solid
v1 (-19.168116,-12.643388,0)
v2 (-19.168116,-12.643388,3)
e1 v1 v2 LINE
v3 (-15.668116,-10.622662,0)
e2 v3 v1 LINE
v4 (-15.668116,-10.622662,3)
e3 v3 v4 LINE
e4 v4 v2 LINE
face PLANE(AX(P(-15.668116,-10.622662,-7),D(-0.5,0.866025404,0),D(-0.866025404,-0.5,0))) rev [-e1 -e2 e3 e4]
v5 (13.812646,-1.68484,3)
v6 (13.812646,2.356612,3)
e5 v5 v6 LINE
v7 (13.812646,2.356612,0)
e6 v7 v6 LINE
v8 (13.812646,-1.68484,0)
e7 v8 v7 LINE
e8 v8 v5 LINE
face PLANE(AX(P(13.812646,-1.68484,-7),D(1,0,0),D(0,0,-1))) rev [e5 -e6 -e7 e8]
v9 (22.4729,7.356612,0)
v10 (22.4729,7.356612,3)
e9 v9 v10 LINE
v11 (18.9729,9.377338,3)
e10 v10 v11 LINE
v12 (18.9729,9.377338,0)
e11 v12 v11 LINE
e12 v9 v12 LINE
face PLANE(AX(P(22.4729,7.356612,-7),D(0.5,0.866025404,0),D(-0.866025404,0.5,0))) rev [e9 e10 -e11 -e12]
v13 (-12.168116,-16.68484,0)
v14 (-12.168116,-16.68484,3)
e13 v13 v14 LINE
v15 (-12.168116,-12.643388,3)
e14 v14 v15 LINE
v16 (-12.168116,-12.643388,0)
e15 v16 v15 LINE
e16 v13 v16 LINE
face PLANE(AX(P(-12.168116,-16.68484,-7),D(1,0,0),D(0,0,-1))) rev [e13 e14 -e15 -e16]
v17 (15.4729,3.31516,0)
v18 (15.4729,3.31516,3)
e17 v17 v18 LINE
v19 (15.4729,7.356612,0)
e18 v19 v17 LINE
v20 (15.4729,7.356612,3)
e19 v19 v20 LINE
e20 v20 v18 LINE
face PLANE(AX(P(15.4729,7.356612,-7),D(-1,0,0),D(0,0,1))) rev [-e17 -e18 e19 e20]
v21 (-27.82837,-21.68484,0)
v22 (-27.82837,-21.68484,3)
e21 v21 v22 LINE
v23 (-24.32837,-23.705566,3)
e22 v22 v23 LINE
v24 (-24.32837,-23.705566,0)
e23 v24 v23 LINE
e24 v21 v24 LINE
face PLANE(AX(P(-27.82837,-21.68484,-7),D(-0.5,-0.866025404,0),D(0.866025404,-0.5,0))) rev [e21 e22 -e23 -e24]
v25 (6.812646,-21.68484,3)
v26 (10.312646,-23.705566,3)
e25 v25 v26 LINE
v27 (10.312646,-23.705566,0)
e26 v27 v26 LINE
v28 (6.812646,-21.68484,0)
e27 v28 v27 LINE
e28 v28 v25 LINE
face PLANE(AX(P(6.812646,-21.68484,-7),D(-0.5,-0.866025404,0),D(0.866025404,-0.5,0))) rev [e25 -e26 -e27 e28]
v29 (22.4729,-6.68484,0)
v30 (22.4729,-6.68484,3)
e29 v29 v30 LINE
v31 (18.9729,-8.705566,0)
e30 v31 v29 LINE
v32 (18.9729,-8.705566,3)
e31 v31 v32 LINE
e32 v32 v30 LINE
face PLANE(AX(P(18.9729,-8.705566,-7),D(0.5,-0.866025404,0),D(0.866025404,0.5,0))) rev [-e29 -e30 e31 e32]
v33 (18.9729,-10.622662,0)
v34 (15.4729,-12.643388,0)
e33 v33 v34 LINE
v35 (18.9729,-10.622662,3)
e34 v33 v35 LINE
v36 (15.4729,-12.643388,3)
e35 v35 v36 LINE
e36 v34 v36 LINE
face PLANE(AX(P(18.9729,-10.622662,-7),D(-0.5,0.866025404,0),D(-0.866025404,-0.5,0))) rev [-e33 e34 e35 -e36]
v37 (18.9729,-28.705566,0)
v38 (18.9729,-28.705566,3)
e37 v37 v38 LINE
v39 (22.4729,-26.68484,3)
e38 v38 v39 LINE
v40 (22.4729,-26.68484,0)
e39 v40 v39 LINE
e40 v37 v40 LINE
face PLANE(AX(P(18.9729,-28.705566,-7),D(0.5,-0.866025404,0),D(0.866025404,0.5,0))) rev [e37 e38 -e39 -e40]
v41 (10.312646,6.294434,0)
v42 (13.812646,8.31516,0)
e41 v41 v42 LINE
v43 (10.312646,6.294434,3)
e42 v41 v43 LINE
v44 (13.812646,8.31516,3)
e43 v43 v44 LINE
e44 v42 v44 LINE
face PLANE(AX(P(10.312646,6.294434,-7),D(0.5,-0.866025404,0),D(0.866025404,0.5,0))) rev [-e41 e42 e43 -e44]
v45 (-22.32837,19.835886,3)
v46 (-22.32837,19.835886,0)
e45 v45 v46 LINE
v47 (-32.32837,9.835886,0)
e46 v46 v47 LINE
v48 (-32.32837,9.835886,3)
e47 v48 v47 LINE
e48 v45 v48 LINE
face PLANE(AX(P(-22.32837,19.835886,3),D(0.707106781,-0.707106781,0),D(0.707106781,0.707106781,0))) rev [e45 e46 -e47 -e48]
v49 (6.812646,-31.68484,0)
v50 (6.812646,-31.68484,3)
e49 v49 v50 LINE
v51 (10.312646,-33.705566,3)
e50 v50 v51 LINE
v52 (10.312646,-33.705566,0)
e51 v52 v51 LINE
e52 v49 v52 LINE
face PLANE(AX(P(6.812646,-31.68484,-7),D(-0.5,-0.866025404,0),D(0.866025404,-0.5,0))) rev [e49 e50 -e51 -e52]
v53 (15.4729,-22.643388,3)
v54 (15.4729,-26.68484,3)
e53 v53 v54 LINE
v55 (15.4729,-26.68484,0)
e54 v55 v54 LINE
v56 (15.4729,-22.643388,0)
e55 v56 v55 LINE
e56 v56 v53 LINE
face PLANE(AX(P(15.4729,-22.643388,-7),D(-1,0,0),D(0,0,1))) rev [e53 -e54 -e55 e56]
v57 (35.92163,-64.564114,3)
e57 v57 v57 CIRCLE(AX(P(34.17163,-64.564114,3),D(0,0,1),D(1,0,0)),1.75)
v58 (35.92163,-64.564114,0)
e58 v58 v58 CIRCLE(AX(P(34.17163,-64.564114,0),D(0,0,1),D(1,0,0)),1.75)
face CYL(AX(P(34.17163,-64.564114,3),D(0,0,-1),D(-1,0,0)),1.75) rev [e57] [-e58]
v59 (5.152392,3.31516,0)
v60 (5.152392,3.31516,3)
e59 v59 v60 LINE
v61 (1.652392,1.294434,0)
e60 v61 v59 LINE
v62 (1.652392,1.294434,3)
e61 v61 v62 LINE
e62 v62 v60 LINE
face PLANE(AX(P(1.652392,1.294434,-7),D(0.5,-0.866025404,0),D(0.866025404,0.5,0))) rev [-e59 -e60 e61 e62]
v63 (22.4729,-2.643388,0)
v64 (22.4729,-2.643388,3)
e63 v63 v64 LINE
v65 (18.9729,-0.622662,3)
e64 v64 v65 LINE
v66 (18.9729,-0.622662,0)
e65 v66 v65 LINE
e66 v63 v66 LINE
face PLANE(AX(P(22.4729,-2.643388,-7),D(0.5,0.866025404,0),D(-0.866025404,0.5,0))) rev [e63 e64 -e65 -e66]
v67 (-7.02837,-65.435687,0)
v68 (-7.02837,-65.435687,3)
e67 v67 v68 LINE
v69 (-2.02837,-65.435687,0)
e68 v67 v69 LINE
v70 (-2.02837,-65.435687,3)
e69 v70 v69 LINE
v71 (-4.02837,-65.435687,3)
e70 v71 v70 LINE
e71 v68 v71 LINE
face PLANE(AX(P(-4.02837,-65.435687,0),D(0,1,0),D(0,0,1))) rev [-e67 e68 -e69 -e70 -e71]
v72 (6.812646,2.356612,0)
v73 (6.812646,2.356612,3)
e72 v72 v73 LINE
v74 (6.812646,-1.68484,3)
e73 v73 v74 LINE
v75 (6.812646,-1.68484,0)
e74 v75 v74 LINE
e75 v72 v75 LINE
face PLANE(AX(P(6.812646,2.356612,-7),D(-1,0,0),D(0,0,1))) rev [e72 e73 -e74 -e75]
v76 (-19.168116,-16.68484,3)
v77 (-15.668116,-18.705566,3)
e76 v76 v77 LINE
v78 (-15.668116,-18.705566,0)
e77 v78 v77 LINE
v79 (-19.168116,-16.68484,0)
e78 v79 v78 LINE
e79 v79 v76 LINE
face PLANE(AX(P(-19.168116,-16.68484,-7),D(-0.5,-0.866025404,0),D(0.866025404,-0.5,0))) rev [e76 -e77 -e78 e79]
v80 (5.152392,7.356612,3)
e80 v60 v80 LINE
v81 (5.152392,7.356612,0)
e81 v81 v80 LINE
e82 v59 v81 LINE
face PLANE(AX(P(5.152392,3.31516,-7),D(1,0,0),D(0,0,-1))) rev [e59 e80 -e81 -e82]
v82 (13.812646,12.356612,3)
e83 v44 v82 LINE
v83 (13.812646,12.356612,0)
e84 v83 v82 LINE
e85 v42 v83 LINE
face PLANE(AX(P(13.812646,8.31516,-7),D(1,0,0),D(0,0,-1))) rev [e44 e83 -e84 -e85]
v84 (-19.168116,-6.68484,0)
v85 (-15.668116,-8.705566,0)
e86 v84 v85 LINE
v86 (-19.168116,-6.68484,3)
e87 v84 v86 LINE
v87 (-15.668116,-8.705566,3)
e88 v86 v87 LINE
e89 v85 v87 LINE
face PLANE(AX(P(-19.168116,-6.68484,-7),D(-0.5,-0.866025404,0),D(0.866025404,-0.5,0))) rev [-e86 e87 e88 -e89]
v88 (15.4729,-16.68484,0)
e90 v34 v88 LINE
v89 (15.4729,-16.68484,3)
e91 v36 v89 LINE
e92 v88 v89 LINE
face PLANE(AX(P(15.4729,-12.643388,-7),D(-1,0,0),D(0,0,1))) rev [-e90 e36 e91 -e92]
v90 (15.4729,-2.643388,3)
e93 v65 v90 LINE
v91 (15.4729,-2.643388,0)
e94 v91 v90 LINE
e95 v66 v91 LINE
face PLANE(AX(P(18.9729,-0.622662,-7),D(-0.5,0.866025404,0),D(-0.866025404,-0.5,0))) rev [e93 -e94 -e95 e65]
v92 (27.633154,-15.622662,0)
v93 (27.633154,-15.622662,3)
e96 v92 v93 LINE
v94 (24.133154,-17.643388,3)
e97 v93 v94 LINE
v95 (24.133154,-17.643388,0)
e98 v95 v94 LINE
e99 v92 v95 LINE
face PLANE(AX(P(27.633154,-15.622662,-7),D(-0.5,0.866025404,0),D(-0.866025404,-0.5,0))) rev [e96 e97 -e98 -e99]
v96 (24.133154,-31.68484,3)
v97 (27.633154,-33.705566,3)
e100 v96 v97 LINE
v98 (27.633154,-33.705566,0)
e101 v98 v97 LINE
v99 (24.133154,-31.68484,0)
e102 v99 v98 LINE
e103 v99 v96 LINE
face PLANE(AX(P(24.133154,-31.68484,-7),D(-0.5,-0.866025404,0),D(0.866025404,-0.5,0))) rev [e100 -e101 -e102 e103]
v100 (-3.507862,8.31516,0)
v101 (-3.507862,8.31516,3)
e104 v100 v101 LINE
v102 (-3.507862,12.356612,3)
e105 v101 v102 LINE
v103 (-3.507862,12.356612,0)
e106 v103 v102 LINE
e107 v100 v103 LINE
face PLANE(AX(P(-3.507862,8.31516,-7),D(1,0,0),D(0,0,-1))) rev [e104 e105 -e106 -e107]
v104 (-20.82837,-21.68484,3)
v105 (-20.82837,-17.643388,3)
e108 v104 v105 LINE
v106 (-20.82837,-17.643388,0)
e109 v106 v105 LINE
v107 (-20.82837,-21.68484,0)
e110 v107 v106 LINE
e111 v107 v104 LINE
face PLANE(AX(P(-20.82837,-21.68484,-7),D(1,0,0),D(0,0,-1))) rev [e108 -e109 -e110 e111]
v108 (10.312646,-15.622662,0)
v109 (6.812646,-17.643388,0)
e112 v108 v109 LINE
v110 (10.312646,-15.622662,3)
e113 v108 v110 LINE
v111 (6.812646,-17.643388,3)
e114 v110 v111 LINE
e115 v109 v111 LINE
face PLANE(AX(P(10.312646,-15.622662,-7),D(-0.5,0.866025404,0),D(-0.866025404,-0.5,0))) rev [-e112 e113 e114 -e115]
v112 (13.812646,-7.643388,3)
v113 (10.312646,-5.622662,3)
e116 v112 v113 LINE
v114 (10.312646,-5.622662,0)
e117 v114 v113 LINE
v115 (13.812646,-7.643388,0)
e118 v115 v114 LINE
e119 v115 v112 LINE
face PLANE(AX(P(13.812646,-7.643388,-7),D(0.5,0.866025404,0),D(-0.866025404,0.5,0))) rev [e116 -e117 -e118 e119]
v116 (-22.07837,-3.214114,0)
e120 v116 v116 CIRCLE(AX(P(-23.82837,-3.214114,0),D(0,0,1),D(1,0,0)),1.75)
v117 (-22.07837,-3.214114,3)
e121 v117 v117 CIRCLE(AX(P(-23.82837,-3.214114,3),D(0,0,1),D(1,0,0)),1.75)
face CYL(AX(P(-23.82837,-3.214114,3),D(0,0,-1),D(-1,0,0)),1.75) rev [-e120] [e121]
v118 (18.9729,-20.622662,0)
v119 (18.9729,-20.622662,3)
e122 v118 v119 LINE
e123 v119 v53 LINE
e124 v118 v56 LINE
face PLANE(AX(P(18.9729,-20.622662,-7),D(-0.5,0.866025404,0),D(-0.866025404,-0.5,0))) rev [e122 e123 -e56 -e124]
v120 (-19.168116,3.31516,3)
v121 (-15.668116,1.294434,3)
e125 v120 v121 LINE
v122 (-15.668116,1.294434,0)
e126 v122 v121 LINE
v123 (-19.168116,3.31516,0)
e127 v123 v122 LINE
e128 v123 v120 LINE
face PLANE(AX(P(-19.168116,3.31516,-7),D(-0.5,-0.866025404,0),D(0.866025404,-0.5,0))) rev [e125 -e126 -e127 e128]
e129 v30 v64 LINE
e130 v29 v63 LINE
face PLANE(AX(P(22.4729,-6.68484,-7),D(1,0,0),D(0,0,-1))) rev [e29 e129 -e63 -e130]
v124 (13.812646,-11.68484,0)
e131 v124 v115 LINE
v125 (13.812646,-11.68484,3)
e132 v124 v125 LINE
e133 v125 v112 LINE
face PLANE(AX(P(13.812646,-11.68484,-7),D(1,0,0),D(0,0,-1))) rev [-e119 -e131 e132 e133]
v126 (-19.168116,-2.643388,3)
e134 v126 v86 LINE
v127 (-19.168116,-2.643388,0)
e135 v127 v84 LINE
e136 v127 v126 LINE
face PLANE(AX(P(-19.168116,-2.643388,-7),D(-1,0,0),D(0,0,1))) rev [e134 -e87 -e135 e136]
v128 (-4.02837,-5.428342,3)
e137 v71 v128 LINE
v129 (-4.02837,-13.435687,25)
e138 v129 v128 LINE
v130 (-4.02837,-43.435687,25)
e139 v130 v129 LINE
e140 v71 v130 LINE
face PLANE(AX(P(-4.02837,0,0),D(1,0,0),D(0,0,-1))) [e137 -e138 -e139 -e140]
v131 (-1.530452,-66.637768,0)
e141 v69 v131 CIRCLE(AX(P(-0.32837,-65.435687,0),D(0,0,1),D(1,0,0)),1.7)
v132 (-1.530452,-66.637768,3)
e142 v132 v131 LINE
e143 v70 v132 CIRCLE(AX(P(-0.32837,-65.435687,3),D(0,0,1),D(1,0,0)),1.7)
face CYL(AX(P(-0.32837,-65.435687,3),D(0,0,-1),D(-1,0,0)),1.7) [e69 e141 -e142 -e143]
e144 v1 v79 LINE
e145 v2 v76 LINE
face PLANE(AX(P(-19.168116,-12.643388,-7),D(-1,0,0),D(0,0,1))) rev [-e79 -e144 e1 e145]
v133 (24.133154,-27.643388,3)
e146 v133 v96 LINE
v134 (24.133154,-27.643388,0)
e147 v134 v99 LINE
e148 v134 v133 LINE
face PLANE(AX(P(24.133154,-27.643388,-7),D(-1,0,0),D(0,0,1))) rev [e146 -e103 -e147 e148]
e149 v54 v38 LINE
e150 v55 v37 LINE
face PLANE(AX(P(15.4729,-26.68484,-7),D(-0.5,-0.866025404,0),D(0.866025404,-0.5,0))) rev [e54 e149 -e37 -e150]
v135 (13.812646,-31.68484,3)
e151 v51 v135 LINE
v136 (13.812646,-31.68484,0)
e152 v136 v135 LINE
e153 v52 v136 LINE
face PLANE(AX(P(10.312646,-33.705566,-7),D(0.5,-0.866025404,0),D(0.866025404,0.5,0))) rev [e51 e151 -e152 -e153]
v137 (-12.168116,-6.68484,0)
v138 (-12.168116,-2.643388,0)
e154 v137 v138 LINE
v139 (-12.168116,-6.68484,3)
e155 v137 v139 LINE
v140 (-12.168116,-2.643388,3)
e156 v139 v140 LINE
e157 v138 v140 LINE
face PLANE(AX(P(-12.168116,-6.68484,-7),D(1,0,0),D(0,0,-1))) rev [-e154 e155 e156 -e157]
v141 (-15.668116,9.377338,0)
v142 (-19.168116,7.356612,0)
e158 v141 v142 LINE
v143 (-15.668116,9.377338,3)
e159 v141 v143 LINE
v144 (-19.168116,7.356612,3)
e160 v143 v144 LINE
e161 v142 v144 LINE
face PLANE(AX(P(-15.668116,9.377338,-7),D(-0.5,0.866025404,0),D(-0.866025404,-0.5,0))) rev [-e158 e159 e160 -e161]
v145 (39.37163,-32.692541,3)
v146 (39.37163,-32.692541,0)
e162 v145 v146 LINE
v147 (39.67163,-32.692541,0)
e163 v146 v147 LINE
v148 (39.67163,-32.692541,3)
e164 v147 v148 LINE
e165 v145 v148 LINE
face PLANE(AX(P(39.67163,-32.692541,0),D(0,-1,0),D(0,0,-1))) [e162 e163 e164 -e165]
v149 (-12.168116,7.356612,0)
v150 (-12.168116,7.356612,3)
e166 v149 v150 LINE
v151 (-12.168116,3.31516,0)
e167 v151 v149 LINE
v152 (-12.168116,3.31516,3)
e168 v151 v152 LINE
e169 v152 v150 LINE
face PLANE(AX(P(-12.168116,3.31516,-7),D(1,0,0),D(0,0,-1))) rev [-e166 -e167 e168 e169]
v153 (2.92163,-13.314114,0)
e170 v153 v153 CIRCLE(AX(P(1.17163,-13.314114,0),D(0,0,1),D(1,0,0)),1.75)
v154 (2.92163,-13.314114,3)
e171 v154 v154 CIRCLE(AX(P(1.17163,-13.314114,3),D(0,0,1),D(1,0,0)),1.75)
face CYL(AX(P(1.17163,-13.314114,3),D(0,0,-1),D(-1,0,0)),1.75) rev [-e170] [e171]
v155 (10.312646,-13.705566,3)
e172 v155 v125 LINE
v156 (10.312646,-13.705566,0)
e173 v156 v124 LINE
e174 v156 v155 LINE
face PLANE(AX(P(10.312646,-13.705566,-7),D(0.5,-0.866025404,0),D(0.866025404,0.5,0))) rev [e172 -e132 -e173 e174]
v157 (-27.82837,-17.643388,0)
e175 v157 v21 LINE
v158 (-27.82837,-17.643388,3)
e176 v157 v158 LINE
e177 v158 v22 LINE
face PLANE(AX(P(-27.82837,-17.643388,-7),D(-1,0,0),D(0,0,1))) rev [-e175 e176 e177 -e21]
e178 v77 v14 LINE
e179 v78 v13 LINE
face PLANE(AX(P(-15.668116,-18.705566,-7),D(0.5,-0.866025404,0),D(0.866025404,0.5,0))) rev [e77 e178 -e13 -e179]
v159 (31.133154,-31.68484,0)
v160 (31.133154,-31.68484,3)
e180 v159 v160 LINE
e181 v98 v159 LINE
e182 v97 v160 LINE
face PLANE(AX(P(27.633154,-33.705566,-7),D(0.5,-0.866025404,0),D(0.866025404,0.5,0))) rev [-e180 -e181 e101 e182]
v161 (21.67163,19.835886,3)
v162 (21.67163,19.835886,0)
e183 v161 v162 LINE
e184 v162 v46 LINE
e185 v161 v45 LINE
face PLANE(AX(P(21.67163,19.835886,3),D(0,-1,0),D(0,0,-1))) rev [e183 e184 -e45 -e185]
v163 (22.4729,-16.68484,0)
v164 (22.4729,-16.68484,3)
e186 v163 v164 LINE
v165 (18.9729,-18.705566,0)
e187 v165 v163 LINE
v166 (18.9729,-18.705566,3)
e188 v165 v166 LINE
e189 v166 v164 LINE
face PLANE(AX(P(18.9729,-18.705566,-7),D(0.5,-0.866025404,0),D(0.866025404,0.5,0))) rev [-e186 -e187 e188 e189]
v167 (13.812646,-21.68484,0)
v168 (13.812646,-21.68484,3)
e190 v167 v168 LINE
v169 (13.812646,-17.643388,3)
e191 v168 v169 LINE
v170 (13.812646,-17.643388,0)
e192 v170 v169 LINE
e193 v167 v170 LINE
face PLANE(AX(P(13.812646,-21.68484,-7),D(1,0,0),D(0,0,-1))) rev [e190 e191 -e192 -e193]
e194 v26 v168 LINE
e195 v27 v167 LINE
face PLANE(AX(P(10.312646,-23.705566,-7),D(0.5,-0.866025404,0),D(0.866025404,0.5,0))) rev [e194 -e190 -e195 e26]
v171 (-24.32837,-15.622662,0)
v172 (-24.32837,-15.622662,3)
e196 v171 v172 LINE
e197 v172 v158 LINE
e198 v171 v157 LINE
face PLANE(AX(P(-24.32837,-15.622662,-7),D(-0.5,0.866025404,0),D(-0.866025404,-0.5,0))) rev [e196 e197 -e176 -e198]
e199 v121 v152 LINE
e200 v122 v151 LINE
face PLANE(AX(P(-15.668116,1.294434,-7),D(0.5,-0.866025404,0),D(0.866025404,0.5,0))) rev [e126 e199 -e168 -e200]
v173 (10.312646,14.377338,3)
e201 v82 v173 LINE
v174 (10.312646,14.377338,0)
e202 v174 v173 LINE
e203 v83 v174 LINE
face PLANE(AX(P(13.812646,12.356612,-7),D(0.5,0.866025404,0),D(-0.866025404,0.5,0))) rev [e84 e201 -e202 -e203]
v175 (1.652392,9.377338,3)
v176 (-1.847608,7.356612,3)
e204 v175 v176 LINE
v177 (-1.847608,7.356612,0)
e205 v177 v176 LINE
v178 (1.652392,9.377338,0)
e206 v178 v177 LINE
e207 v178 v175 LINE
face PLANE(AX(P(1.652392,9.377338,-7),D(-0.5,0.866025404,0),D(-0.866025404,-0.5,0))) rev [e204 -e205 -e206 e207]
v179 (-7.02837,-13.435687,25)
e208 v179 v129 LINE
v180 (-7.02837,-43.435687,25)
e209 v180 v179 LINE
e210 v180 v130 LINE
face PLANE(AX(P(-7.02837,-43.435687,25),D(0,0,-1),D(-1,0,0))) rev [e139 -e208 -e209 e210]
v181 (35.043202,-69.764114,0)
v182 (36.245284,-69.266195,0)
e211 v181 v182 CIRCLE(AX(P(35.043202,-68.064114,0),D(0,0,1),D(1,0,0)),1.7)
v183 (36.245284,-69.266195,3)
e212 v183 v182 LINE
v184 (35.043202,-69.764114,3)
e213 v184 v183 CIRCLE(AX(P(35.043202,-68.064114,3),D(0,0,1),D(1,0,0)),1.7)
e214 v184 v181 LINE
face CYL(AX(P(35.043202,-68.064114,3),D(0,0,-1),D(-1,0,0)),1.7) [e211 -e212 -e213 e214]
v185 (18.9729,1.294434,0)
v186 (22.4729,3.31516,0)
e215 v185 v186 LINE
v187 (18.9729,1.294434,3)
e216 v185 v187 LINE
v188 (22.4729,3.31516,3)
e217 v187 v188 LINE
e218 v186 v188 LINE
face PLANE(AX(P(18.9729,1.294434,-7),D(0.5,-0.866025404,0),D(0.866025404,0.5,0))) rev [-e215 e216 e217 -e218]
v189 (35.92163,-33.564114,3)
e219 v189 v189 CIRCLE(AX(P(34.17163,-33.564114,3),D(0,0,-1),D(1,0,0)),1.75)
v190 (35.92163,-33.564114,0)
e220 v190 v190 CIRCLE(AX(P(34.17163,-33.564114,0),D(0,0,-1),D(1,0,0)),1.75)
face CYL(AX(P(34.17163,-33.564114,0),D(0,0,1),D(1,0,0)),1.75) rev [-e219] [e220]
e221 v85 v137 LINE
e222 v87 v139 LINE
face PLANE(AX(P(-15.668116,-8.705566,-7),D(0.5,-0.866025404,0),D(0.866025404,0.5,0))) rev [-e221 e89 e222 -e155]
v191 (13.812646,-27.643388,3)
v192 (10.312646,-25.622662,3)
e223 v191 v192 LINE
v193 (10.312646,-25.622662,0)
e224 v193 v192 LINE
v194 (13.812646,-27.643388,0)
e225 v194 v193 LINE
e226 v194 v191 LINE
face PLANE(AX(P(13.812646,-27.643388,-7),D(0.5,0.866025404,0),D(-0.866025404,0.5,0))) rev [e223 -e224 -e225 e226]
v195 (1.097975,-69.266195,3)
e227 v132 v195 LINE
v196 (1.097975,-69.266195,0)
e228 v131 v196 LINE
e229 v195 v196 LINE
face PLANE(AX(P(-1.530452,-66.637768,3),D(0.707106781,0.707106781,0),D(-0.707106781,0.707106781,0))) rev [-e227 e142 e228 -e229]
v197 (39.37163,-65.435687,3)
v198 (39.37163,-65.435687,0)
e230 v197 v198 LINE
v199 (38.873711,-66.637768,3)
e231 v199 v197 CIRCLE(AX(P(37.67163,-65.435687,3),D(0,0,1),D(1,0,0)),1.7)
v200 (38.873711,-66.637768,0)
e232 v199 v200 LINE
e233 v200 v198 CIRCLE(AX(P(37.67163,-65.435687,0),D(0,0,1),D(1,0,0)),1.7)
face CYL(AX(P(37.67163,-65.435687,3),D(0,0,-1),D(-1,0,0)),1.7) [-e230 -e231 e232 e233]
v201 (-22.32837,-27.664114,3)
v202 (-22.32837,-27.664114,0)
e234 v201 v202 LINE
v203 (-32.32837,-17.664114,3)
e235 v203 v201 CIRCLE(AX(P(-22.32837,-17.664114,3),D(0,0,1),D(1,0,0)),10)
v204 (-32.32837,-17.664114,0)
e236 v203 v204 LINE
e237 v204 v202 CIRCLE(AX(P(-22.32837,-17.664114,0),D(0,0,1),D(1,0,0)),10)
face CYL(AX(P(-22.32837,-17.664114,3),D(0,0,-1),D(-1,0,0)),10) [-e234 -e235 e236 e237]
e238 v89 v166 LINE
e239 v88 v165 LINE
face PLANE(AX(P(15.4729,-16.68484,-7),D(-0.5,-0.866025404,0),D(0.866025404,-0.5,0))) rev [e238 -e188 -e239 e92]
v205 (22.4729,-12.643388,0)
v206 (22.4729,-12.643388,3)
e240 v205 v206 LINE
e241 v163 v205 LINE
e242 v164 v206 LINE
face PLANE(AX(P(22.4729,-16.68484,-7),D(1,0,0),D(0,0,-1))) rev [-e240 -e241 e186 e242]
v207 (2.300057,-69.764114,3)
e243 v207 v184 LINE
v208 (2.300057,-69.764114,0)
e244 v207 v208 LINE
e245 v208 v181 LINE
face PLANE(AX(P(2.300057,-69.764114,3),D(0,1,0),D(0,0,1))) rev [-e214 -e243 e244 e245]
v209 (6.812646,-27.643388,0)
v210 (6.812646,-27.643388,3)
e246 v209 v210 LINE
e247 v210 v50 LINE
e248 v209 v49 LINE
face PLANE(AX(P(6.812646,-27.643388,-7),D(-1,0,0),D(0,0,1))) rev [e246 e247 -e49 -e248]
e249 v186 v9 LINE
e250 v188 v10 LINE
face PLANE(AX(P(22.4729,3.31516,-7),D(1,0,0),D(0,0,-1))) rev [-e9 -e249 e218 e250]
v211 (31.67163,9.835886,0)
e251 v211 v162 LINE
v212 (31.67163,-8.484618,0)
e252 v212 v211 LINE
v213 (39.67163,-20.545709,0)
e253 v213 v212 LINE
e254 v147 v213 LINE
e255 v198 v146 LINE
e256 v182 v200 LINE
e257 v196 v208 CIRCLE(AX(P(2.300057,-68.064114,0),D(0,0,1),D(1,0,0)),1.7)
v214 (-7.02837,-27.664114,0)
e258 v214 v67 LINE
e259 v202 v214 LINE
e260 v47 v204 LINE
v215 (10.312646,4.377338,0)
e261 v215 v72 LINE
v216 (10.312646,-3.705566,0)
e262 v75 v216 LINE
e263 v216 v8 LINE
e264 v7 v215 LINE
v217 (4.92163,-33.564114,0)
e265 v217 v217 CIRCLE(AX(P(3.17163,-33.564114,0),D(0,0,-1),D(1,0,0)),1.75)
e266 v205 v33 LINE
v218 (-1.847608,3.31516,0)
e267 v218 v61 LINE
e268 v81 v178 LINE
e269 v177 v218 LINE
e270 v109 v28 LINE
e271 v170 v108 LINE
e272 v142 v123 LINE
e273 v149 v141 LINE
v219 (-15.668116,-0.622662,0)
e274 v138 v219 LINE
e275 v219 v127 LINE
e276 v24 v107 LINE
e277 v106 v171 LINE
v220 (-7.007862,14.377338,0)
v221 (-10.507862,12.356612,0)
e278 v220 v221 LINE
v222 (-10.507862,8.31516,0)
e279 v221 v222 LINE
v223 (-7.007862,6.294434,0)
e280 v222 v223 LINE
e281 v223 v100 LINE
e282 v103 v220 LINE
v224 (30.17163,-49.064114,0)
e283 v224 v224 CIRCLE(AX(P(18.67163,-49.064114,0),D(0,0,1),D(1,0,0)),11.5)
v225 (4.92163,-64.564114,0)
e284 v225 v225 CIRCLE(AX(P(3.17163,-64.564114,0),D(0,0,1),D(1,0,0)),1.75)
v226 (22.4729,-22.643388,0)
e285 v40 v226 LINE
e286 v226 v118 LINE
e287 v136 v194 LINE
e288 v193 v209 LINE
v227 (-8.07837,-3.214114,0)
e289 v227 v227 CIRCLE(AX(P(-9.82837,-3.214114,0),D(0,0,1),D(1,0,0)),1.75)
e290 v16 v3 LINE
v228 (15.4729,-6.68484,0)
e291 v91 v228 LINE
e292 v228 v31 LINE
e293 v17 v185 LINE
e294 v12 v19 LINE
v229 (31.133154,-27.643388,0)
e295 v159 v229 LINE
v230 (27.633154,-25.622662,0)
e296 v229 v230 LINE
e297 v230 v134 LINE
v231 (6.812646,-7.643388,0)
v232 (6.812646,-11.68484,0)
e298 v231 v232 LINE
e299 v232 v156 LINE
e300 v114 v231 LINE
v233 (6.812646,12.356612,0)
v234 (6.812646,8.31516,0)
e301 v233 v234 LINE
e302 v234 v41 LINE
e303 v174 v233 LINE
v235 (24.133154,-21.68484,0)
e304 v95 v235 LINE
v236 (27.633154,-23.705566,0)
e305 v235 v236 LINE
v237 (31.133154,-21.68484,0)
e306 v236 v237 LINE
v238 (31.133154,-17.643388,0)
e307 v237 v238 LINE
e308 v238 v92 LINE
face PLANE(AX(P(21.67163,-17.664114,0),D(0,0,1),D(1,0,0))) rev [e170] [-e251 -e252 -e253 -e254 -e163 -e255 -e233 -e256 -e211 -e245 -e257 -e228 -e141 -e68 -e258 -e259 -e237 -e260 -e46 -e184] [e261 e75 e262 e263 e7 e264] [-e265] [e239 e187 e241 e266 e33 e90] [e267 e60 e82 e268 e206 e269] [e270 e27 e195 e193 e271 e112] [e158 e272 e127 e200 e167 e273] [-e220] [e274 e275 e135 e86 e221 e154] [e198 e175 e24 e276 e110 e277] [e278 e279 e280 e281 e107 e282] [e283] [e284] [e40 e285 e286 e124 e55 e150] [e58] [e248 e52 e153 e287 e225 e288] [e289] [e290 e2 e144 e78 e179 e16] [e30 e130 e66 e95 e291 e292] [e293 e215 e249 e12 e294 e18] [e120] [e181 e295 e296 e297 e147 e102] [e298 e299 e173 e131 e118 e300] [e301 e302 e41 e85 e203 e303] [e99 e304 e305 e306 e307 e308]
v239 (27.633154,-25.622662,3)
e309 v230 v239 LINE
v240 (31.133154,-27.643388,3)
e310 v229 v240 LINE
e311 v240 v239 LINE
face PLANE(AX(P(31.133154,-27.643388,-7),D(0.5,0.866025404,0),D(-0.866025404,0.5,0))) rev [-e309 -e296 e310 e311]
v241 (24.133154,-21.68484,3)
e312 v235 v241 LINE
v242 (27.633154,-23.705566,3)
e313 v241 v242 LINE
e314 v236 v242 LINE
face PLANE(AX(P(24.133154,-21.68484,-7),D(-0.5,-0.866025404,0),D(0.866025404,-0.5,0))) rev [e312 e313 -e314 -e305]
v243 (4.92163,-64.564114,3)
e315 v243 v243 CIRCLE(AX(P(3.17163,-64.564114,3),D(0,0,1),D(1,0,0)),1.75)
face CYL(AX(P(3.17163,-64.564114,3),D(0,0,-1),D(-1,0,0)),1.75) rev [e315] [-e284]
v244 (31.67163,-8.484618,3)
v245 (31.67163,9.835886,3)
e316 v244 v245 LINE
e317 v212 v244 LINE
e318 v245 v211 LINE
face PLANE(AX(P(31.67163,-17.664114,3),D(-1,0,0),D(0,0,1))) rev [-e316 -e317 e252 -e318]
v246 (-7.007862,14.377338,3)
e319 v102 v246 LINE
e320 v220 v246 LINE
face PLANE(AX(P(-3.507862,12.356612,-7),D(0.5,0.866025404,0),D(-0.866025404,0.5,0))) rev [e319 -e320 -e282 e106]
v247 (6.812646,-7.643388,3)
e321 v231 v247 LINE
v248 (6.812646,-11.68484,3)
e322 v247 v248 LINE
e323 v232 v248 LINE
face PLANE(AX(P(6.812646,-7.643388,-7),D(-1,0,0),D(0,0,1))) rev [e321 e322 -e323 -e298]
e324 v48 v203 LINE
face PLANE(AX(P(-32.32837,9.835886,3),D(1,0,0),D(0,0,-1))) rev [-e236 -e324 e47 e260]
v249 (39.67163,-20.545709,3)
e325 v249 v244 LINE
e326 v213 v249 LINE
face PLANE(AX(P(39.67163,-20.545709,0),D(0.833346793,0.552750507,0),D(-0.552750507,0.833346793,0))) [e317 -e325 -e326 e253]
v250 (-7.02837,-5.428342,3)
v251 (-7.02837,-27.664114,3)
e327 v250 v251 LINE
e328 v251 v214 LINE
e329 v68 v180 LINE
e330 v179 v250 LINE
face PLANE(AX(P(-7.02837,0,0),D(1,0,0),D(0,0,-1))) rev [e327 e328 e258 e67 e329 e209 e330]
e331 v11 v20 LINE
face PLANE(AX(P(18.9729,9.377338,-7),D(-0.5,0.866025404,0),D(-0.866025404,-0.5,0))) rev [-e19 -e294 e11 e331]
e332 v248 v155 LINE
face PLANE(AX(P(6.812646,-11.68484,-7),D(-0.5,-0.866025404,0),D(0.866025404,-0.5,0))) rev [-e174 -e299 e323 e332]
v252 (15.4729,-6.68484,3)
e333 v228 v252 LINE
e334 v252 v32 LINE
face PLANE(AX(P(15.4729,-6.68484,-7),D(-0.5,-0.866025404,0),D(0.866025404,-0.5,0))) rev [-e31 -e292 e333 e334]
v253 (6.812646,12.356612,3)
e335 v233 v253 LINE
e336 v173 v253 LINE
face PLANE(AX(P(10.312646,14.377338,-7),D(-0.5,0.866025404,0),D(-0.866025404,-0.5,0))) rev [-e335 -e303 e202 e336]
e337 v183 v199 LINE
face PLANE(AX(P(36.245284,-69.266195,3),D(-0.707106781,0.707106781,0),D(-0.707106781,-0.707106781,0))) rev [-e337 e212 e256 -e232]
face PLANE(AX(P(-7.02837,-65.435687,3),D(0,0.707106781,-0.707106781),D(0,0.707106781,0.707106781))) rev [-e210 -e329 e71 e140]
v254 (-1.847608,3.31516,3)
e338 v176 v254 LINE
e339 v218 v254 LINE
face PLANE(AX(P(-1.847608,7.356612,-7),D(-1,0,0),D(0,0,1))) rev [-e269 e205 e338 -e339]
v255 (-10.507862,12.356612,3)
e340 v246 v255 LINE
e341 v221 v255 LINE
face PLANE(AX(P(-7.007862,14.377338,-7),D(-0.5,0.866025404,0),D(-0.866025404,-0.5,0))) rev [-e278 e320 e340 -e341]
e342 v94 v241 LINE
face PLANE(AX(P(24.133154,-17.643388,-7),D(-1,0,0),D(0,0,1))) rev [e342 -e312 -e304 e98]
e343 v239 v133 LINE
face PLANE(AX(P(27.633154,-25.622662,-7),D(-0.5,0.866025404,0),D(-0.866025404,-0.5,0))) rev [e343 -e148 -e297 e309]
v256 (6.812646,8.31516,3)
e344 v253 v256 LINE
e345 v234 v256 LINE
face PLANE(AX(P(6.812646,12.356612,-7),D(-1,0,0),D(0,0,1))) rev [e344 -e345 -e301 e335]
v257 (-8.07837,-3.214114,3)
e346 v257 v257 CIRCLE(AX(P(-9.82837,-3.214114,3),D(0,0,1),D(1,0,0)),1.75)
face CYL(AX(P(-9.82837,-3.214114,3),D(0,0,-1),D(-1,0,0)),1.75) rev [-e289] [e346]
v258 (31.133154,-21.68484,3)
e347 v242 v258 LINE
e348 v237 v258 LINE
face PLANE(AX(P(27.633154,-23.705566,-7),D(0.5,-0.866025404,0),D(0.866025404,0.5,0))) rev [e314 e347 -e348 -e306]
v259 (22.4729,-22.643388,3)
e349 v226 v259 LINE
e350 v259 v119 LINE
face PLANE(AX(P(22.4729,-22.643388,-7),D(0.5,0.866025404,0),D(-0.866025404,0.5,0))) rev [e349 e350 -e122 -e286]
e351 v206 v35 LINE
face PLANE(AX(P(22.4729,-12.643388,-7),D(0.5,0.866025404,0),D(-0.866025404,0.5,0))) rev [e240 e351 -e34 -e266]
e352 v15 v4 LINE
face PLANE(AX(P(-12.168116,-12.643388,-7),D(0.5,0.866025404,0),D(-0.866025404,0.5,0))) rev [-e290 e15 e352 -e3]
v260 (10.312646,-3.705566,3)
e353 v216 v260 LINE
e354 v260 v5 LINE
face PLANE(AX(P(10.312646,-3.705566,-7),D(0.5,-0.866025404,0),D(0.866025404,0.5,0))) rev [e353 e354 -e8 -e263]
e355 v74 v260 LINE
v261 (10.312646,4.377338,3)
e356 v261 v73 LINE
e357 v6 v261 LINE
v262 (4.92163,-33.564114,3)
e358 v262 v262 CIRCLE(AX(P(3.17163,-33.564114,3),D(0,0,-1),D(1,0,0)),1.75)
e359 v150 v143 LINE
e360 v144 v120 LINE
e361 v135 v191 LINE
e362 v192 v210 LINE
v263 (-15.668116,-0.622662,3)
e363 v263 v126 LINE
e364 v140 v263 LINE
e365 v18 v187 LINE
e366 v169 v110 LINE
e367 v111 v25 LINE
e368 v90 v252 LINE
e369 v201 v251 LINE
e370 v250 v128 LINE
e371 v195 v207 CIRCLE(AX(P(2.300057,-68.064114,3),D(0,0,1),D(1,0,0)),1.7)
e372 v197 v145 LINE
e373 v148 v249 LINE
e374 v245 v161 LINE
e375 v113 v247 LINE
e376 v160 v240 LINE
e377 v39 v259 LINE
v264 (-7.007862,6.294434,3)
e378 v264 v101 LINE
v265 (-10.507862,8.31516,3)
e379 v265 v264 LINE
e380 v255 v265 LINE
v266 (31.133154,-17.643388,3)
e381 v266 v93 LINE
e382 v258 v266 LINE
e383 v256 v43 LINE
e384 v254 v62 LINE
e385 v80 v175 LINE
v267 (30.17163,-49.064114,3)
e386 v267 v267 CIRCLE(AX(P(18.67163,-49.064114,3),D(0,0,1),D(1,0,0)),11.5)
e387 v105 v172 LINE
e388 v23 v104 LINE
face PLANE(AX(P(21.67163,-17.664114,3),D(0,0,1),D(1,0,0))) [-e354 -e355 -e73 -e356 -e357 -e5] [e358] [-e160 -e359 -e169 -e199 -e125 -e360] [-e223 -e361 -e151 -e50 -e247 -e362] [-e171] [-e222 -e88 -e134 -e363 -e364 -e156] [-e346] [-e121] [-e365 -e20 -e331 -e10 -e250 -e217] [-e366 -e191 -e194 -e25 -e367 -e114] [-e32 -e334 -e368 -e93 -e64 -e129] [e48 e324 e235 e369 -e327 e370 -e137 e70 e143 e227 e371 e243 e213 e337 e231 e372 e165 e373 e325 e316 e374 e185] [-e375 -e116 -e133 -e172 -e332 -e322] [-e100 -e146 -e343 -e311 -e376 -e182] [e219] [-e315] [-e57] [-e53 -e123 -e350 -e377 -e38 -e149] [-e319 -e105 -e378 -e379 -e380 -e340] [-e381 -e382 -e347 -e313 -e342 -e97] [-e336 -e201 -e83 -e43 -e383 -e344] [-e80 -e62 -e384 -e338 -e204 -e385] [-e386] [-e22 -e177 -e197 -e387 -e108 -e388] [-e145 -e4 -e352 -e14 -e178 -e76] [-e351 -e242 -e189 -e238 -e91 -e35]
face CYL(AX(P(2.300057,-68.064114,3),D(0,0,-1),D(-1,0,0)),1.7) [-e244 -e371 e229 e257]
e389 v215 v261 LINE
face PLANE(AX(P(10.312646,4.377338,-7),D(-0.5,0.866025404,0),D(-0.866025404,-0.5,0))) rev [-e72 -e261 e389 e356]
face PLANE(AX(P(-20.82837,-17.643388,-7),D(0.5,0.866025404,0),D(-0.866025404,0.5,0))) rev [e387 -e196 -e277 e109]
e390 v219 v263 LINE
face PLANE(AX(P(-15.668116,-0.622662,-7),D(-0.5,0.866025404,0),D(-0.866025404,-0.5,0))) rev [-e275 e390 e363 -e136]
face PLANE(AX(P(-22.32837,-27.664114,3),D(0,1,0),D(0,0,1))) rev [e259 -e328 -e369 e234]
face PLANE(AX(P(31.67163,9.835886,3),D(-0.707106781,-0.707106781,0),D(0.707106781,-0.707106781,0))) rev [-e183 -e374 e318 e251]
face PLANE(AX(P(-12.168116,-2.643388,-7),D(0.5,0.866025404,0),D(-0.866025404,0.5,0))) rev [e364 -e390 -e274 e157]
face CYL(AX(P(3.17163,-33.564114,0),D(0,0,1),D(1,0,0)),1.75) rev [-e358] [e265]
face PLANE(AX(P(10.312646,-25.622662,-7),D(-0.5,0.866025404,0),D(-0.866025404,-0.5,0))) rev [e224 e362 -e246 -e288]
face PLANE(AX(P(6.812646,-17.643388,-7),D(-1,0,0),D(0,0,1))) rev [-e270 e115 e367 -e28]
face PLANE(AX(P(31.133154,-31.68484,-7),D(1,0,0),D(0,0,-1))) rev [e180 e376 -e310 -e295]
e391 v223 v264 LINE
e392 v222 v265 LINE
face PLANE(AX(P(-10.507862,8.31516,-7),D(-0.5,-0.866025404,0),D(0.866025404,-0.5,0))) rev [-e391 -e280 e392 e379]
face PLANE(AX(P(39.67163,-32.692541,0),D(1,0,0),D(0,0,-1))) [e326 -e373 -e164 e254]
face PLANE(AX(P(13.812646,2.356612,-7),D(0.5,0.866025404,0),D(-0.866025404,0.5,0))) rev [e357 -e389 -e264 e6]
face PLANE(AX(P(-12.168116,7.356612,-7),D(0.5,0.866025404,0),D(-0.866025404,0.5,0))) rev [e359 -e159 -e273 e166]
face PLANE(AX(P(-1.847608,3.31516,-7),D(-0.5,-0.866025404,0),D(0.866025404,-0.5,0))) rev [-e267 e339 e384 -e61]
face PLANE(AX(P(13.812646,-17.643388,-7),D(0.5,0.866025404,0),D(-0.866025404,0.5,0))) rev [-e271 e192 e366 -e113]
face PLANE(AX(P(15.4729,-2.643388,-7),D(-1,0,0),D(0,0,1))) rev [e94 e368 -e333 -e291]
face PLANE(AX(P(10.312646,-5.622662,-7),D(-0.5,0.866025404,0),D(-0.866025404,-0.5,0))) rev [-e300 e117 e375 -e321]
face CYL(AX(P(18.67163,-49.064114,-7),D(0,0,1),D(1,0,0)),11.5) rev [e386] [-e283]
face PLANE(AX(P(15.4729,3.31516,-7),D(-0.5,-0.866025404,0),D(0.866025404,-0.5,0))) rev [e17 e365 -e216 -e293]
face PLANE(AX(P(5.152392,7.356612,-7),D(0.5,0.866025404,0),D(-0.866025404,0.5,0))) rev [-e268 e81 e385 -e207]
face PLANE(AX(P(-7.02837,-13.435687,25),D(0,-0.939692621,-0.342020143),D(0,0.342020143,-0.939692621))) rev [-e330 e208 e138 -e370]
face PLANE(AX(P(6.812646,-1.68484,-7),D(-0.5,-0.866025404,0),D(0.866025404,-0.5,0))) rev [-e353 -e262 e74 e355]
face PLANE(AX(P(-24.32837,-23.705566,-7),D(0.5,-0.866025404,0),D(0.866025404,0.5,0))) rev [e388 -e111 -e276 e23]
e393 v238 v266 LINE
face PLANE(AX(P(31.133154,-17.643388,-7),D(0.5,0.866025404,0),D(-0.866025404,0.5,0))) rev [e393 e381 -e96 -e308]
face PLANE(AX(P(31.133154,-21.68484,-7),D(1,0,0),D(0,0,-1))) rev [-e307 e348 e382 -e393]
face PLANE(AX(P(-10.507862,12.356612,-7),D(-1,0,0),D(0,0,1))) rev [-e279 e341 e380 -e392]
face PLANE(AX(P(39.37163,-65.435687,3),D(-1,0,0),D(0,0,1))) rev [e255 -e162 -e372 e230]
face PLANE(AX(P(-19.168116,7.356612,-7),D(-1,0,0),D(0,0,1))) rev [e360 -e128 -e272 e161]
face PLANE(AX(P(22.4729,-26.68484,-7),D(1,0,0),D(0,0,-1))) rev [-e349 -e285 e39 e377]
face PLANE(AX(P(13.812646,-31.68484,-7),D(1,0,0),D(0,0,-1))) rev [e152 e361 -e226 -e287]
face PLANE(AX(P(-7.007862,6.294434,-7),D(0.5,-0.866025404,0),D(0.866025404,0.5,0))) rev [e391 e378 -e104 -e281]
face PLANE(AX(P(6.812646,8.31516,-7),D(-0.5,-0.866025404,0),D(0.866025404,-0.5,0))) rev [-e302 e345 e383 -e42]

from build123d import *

# Parameters (mm, degrees)
SKETCH2_R               = 1.75
BOSS_EXTRUDE1_DEPTH     = 3
BOSS_EXTRUDE1_2_DEPTH   = 3
BOSS_EXTRUDE2_START     = -3
BOSS_EXTRUDE2_DEPTH     = 3
SKETCH5_W               = 3
SKETCH5_H               = 37.771572876
BOSS_EXTRUDE3_DEPTH     = 2
BOSS_EXTRUDE4_DEPTH     = 3
CUT_EXTRUDE1_DEPTH      = 10
SKETCH9_R               = 11.5
CUT_EXTRUDE2_DEPTH      = 10
FILL_PATTERN1_OUTLINE_R = 1.75
FILL_PATTERN1_DEPTH     = 3


# Read off the part's stored shape, not the designer's step: Fill Pattern1
with BuildPart() as part:
    # Sketch2 → Boss-Extrude1 (new body)
    with BuildSketch(Plane.XY):
        with BuildLine():
            Line((31.67162959, -17.664113805), (31.67162959, 9.835886195))
            Line((31.67162959, 9.835886195), (21.67162959, 19.835886195))
            Line((21.67162959, 19.835886195), (-22.32837041, 19.835886195))
            Line((-22.32837041, 19.835886195), (-32.32837041, 9.835886195))
            Line((-32.32837041, 9.835886195), (-32.32837041, -17.664113805))
            ThreePointArc((-32.32837041, -17.664113805), (-29.399438222, -24.735181617), (-22.32837041, -27.664113805))
            Line((-22.32837041, -27.664113805), (21.67162959, -27.664113805))
            ThreePointArc((21.67162959, -27.664113805), (28.742697402, -24.735181617), (31.67162959, -17.664113805))
        make_face()
        with Locations((18.67162959, 5.585886195)):
            Circle(SKETCH2_R, mode=Mode.SUBTRACT)
        with Locations((1.17162959, -13.314113805)):
            Circle(SKETCH2_R, mode=Mode.SUBTRACT)
        with Locations((-23.82837041, -3.214113805)):
            Circle(SKETCH2_R, mode=Mode.SUBTRACT)
        with Locations((-9.82837041, -3.214113805)):
            Circle(SKETCH2_R, mode=Mode.SUBTRACT)
    extrude(amount=BOSS_EXTRUDE1_DEPTH)



with BuildPart() as body_2:
    # Sketch2 → Boss-Extrude1 2 (new body)
    with BuildSketch(Plane.XY):
        with BuildLine():
            Line((-2.02837041, -32.69254093), (-2.02837041, -65.435686681))
            ThreePointArc((-2.02837041, -65.435686681), (-1.898965615, -66.086248516), (-1.530451938, -66.637768209))
            Line((-1.530451938, -66.637768209), (1.097975187, -69.266195333))
            ThreePointArc((1.097975187, -69.266195333), (1.64949488, -69.634709011), (2.300056715, -69.764113805))
            Line((2.300056715, -69.764113805), (35.043202465, -69.764113805))
            ThreePointArc((35.043202465, -69.764113805), (35.6937643, -69.634709011), (36.245283993, -69.266195333))
            Line((36.245283993, -69.266195333), (38.873711118, -66.637768209))
            ThreePointArc((38.873711118, -66.637768209), (39.242224795, -66.086248516), (39.37162959, -65.435686681))
            Line((39.37162959, -65.435686681), (39.37162959, -32.69254093))
            ThreePointArc((39.37162959, -32.69254093), (39.242224795, -32.041979095), (38.873711118, -31.490459402))
            Line((38.873711118, -31.490459402), (36.245283993, -28.862032277))
            ThreePointArc((36.245283993, -28.862032277), (35.6937643, -28.4935186), (35.043202465, -28.364113805))
            Line((35.043202465, -28.364113805), (2.300056715, -28.364113805))
            ThreePointArc((2.300056715, -28.364113805), (1.64949488, -28.4935186), (1.097975187, -28.862032277))
            Line((1.097975187, -28.862032277), (-1.530451938, -31.490459402))
            ThreePointArc((-1.530451938, -31.490459402), (-1.898965615, -32.041979095), (-2.02837041, -32.69254093))
        make_face()
        with Locations((34.17162959, -33.564113805)):
            Circle(SKETCH2_R, mode=Mode.SUBTRACT)
        with Locations((3.17162959, -33.564113805)):
            Circle(SKETCH2_R, mode=Mode.SUBTRACT)
        with Locations((34.17162959, -64.564113805)):
            Circle(SKETCH2_R, mode=Mode.SUBTRACT)
        with Locations((3.17162959, -64.564113805)):
            Circle(SKETCH2_R, mode=Mode.SUBTRACT)
    extrude(amount=BOSS_EXTRUDE1_2_DEPTH)


with BuildPart() as part_1:
    add(part.part)

    add(body_2.part)  # Boss-Extrude2 merges body 2
    # Sketch3 → Boss-Extrude2 (add)
    with BuildSketch(Plane.XY.offset(3).offset(BOSS_EXTRUDE2_START)):
        with BuildLine():
            Line((-2.02837041, -32.69254093), (-2.02837041, -27.664113805))
            Line((-2.02837041, -27.664113805), (21.67162959, -27.664113805))
            ThreePointArc((21.67162959, -27.664113805), (28.742697402, -24.735181617), (31.67162959, -17.664113805))
            Line((31.67162959, -17.664113805), (31.67162959, -8.484617852))
            Line((31.67162959, -8.484617852), (39.67162959, -20.545709175))
            Line((39.67162959, -20.545709175), (39.67162959, -32.69254093))
            Line((39.67162959, -32.69254093), (35.689147538, -32.69254093))
            ThreePointArc((35.689147538, -32.69254093), (34.17162959, -31.814113805), (32.654111642, -32.69254093))
            Line((32.654111642, -32.69254093), (4.689147538, -32.69254093))
            ThreePointArc((4.689147538, -32.69254093), (3.17162959, -31.814113805), (1.654111642, -32.69254093))
            Line((1.654111642, -32.69254093), (-2.02837041, -32.69254093))
        make_face()
    extrude(amount=BOSS_EXTRUDE2_DEPTH)

    # Sketch5 → Boss-Extrude3 (add)
    with BuildSketch(Plane.ZY.offset(2.02837041)):
        with Locations((1.5, -46.549900243)):
            Rectangle(SKETCH5_W, SKETCH5_H)
    extrude(amount=BOSS_EXTRUDE3_DEPTH)

    # Sketch6 → Boss-Extrude4 (add)
    with BuildSketch(Plane.ZY.offset(4.02837041)):
        Polygon((3, -27.664113805), (0, -27.664113805), (0, -65.435686681), (3, -65.435686681), (25, -43.435686681), (25, -13.435686681), (3, -5.428341527), align=None)
    extrude(amount=BOSS_EXTRUDE4_DEPTH)

    # Sketch7 → Cut-Extrude1 (cut)
    with BuildSketch(Plane.XY.offset(3)):
        Polygon((-24.32837041, -23.70556569), (-20.82837041, -21.684839748), (-20.82837041, -17.643387863), (-24.32837041, -15.622661921), (-27.82837041, -17.643387863), (-27.82837041, -21.684839748), align=None)
    extrude(amount=-CUT_EXTRUDE1_DEPTH, mode=Mode.SUBTRACT)

    # Sketch9 → Cut-Extrude2 (cut)
    with BuildSketch(Plane.XY.offset(3)):
        with Locations((18.67162959, -49.064113805)):
            Circle(SKETCH9_R)
    extrude(amount=-CUT_EXTRUDE2_DEPTH, mode=Mode.SUBTRACT)

    # Fill Pattern1 outline → Fill Pattern1 (cut)
    # profile 1 of 16: a face of its own
    with BuildSketch(Plane.XY):
        Polygon((13.812645741, 2.356612137), (10.312645741, 4.377338079), (6.812645741, 2.356612137), (6.812645741, -1.684839748), (10.312645741, -3.70556569), (13.812645741, -1.684839748), align=None)
    # profile 2 of 16: a face of its own
    with BuildSketch(Plane.XY):
        Polygon((22.472899779, 7.356612137), (18.972899779, 9.377338079), (15.472899779, 7.356612137), (15.472899779, 3.315160252), (18.972899779, 1.29443431), (22.472899779, 3.315160252), align=None)
        with Locations((18.67162959, 5.585886195)):
            Circle(FILL_PATTERN1_OUTLINE_R, mode=Mode.SUBTRACT)
    # profile 3 of 16: a face of its own
    with BuildSketch(Plane.XY):
        Polygon((-12.168116372, -12.643387863), (-15.668116372, -10.622661921), (-19.168116372, -12.643387863), (-19.168116372, -16.684839748), (-15.668116372, -18.70556569), (-12.168116372, -16.684839748), align=None)
    # profile 4 of 16: a face of its own
    with BuildSketch(Plane.XY):
        Polygon((6.812645741, -27.643387863), (6.812645741, -31.684839748), (10.312645741, -33.70556569), (13.812645741, -31.684839748), (13.812645741, -27.643387863), (10.312645741, -25.622661921), align=None)
    # profile 5 of 16: a face of its own
    with BuildSketch(Plane.XY):
        Polygon((10.312645741, 14.377338079), (6.812645741, 12.356612137), (6.812645741, 8.315160252), (10.312645741, 6.29443431), (13.812645741, 8.315160252), (13.812645741, 12.356612137), align=None)
    # profile 6 of 16: a face of its own
    with BuildSketch(Plane.XY):
        Polygon((10.312645741, -15.622661921), (6.812645741, -17.643387863), (6.812645741, -21.684839748), (10.312645741, -23.70556569), (13.812645741, -21.684839748), (13.812645741, -17.643387863), align=None)
    # profile 7 of 16: a face of its own
    with BuildSketch(Plane.XY):
        Polygon((10.312645741, -5.622661921), (6.812645741, -7.643387863), (6.812645741, -11.684839748), (10.312645741, -13.70556569), (13.812645741, -11.684839748), (13.812645741, -7.643387863), align=None)
    # profile 8 of 16: a face of its own
    with BuildSketch(Plane.XY):
        Polygon((22.472899779, -22.643387863), (18.972899779, -20.622661921), (15.472899779, -22.643387863), (15.472899779, -26.684839748), (18.972899779, -28.70556569), (22.472899779, -26.684839748), align=None)
    # profile 9 of 16: a face of its own
    with BuildSketch(Plane.XY):
        Polygon((31.133153817, -17.643387863), (27.633153817, -15.622661921), (24.133153817, -17.643387863), (24.133153817, -21.684839748), (27.633153817, -23.70556569), (31.133153817, -21.684839748), align=None)
    # profile 10 of 16: a face of its own
    with BuildSketch(Plane.XY):
        Polygon((-1.847608297, 7.356612137), (-1.847608297, 3.315160252), (1.652391703, 1.29443431), (5.152391703, 3.315160252), (5.152391703, 7.356612137), (1.652391703, 9.377338079), align=None)
    # profile 11 of 16: a face of its own
    with BuildSketch(Plane.XY):
        Polygon((15.472899779, -2.643387863), (15.472899779, -6.684839748), (18.972899779, -8.70556569), (22.472899779, -6.684839748), (22.472899779, -2.643387863), (18.972899779, -0.622661921), align=None)
    # profile 12 of 16: a face of its own
    with BuildSketch(Plane.XY):
        Polygon((-10.507862334, 12.356612137), (-10.507862334, 8.315160252), (-7.007862334, 6.29443431), (-3.507862334, 8.315160252), (-3.507862334, 12.356612137), (-7.007862334, 14.377338079), align=None)
    # profile 13 of 16: a face of its own
    with BuildSketch(Plane.XY):
        Polygon((-12.168116372, -2.643387863), (-15.668116372, -0.622661921), (-19.168116372, -2.643387863), (-19.168116372, -6.684839748), (-15.668116372, -8.70556569), (-12.168116372, -6.684839748), align=None)
    # profile 14 of 16: a face of its own
    with BuildSketch(Plane.XY):
        Polygon((18.972899779, -10.622661921), (15.472899779, -12.643387863), (15.472899779, -16.684839748), (18.972899779, -18.70556569), (22.472899779, -16.684839748), (22.472899779, -12.643387863), align=None)
    # profile 15 of 16: a face of its own
    with BuildSketch(Plane.XY):
        Polygon((-19.168116372, 7.356612137), (-19.168116372, 3.315160252), (-15.668116372, 1.29443431), (-12.168116372, 3.315160252), (-12.168116372, 7.356612137), (-15.668116372, 9.377338079), align=None)
    # profile 16 of 16: a face of its own
    with BuildSketch(Plane.XY):
        Polygon((24.133153817, -27.643387863), (24.133153817, -31.684839748), (27.633153817, -33.70556569), (31.133153817, -31.684839748), (31.133153817, -27.643387863), (27.633153817, -25.622661921), align=None)
    extrude(amount=FILL_PATTERN1_DEPTH, mode=Mode.SUBTRACT)


solid = part_1.part
